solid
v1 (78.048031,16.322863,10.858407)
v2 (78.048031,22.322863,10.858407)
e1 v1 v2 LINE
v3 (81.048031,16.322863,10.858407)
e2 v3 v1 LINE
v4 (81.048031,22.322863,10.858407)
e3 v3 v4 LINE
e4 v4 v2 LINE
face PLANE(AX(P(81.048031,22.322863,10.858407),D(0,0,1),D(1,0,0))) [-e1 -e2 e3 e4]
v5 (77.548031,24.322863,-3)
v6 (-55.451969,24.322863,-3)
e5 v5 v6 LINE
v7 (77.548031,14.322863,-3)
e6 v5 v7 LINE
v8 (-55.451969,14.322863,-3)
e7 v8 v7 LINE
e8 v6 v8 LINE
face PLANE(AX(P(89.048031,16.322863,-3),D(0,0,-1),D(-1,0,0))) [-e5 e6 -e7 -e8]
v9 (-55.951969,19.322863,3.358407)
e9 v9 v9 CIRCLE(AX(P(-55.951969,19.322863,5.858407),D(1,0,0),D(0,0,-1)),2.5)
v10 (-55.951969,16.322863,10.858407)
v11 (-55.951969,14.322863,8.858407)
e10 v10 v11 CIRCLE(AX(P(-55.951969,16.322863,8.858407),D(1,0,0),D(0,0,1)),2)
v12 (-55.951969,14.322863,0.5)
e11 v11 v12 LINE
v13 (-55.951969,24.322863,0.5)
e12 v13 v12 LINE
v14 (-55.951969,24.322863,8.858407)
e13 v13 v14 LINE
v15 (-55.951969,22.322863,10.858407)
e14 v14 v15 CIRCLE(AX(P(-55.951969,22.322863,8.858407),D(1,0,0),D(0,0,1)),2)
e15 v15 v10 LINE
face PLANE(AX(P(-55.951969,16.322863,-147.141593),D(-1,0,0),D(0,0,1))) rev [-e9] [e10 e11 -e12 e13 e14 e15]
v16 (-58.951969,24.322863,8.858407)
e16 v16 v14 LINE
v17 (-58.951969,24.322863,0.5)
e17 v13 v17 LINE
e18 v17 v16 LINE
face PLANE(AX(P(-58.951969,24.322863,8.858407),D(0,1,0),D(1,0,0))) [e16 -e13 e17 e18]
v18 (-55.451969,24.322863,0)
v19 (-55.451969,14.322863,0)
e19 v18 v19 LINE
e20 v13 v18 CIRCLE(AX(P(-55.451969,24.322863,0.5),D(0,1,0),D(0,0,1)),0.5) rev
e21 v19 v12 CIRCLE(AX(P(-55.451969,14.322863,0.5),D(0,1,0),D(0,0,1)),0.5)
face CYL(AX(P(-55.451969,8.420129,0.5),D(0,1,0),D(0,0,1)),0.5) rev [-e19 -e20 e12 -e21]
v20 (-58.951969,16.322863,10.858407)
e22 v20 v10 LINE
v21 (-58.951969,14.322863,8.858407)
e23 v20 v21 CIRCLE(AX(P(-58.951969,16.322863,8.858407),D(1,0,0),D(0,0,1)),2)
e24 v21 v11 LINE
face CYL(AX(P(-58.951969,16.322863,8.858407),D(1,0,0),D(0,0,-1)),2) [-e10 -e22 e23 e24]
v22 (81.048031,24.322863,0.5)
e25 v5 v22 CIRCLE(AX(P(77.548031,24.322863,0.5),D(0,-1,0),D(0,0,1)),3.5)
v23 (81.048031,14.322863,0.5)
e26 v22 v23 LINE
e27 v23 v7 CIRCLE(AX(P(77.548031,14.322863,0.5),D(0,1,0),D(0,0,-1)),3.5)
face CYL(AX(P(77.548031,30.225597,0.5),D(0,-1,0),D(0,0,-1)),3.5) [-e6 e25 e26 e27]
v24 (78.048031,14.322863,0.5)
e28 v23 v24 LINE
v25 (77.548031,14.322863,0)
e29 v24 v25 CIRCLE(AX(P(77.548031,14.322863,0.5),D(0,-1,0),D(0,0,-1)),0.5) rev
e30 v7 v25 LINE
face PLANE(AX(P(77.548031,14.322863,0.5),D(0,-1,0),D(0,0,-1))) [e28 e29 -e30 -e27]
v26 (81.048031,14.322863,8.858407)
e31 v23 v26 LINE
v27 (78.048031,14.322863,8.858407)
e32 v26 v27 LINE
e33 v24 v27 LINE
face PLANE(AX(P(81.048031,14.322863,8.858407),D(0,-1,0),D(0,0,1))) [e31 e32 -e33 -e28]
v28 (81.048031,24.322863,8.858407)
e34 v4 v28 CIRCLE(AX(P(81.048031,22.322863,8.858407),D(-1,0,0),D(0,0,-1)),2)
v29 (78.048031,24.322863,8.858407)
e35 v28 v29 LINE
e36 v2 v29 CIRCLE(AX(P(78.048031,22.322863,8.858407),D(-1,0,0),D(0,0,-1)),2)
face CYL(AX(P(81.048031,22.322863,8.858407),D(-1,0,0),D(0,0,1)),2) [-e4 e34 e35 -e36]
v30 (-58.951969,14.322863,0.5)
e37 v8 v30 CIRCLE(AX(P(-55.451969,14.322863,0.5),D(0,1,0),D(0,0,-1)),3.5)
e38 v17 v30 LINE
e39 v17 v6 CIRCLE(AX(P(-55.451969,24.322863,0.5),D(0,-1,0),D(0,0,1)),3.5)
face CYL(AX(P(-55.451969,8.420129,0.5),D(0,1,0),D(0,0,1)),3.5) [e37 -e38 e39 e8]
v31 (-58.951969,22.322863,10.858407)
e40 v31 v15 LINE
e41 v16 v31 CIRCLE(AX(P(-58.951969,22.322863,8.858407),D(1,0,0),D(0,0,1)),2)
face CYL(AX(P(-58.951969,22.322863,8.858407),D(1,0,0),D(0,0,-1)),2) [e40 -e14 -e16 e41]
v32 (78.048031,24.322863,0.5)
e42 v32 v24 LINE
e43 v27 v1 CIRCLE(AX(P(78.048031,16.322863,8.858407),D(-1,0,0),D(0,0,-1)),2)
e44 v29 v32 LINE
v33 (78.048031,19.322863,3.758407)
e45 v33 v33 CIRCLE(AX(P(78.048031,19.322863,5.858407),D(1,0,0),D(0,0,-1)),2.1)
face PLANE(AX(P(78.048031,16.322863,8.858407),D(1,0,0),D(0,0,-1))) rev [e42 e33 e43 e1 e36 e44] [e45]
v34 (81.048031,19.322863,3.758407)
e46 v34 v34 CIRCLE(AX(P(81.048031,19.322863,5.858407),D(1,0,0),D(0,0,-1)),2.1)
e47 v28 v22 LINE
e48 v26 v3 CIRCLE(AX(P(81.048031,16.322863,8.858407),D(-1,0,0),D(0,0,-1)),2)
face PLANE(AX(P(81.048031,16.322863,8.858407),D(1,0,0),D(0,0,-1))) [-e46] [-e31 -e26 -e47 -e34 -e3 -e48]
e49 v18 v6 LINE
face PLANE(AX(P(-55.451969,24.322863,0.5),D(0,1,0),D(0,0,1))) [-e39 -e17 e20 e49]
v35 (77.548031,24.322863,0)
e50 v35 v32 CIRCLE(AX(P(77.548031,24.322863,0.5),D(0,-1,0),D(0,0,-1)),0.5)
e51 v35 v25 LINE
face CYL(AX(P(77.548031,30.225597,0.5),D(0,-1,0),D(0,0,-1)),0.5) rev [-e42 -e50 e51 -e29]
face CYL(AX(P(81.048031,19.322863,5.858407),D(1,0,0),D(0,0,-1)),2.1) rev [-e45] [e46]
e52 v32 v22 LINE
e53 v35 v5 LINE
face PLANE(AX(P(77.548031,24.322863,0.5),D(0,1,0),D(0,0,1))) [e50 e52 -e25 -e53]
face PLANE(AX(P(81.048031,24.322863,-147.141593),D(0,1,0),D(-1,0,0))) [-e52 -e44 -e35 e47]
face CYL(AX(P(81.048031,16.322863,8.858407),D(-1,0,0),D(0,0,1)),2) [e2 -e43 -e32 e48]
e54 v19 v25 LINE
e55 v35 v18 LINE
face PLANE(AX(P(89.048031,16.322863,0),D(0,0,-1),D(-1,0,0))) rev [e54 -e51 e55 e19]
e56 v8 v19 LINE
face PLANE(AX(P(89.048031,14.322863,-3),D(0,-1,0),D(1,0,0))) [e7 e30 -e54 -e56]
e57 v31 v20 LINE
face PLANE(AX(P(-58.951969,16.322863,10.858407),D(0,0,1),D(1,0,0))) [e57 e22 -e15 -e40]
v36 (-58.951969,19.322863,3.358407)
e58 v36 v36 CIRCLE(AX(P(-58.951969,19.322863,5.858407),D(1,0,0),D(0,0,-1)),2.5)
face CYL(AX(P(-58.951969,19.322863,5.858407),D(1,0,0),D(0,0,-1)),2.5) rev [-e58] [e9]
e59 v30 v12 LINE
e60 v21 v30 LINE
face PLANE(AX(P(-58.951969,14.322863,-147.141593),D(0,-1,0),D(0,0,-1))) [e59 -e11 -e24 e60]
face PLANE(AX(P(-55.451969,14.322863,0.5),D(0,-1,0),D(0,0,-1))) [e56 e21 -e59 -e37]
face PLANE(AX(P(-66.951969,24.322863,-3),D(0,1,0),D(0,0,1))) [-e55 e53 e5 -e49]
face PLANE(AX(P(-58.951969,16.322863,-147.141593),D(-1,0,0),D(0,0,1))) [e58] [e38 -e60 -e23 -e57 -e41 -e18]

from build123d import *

# Parameters (mm, degrees)
SKETCH_1_R             = 2.5
SKETCH_1_R_2           = 2
SM_BASE_FLANGE_1_DEPTH = 3
OTHER_START            = 78.048031103
OTHER_1_OUTLINE_R      = 2.5
OTHER_1_OUTLINE_R_2    = 2
OTHER_1_DEPTH          = 3
OTHER_START_2          = -68.951968897
OTHER_1_2_OUTLINE_W    = 10
OTHER_1_2_OUTLINE_H    = 3
OTHER_1_2_DEPTH        = 10
OTHER_START_3          = 81.048031103
OTHER_1_3_OUTLINE_W    = 10
OTHER_1_3_OUTLINE_H    = 3
OTHER_1_3_DEPTH        = 10
OTHER_START_4          = -58.951968897
OTHER_1_4_OUTLINE_R    = 2.5
OTHER_1_4_DEPTH        = 3.5
OTHER_START_5          = 77.548031103
OTHER_1_5_OUTLINE_R    = 2.5
OTHER_1_5_DEPTH        = 3.5
OTHER_START_6          = 13
OTHER_1_6_DEPTH        = 12
HOLE_WIZARD_M5_1_D     = 4.2


with BuildPart() as part:
    # 基体-法兰1: sheet metal written as solids
    # Sketch 1 → 基体-法兰1 (new body)
    with BuildSketch(Plane.XY):
        with BuildLine():
            Line((-66.951968897, 24.322862815), (89.048031103, 24.322862815))
            ThreePointArc((89.048031103, 24.322862815), (90.462244666, 23.737076377), (91.048031103, 22.322862815))
            Line((91.048031103, 22.322862815), (91.048031103, 16.322862815))
            ThreePointArc((91.048031103, 16.322862815), (90.462244666, 14.908649252), (89.048031103, 14.322862815))
            Line((89.048031103, 14.322862815), (-66.951968897, 14.322862815))
            ThreePointArc((-66.951968897, 14.322862815), (-68.366182459, 14.908649252), (-68.951968897, 16.322862815))
            Line((-68.951968897, 16.322862815), (-68.951968897, 22.322862815))
            ThreePointArc((-68.951968897, 22.322862815), (-68.366182459, 23.737076377), (-66.951968897, 24.322862815))
        make_face()
        with Locations((-63.951968897, 19.322862815)):
            Circle(SKETCH_1_R, mode=Mode.SUBTRACT)
        with Locations((86.048031103, 19.322862815)):
            Circle(SKETCH_1_R_2, mode=Mode.SUBTRACT)
    extrude(amount=-SM_BASE_FLANGE_1_DEPTH)

    # Other 1 2 outline → Other 1 2 (cut)
    with BuildSketch(Plane.YZ.offset(OTHER_START_2)):
        with Locations((19.322862815, -1.5)):
            Rectangle(OTHER_1_2_OUTLINE_W, OTHER_1_2_OUTLINE_H)
    extrude(amount=OTHER_1_2_DEPTH, mode=Mode.SUBTRACT)

    # Other 1 3 outline → Other 1 3 (cut)
    with BuildSketch(Plane.YZ.offset(OTHER_START_3)):
        with Locations((19.322862815, -1.5)):
            Rectangle(OTHER_1_3_OUTLINE_W, OTHER_1_3_OUTLINE_H)
    extrude(amount=OTHER_1_3_DEPTH, mode=Mode.SUBTRACT)

    # Other 1 4 outline → Other 1 4 (add)
    with BuildSketch(Plane.YZ.offset(OTHER_START_4)):
        with BuildLine():
            Line((14.322862815, 0), (24.322862815, 0))
            Line((24.322862815, 0), (24.322862815, 8.858407346))
            ThreePointArc((24.322862815, 8.858407346), (23.737076378, 10.272620909), (22.322862815, 10.858407346))
            Line((22.322862815, 10.858407346), (16.322862815, 10.858407346))
            ThreePointArc((16.322862815, 10.858407346), (14.908649252, 10.272620909), (14.322862815, 8.858407346))
            Line((14.322862815, 8.858407346), (14.322862815, 0))
        make_face()
        with Locations((19.322862815, 5.858407346)):
            Circle(OTHER_1_4_OUTLINE_R, mode=Mode.SUBTRACT)
    extrude(amount=OTHER_1_4_DEPTH)



with BuildPart() as body_2:
    # Other 1: read off the stored shape, not the designer's step
    # Other 1 outline → Other 1 (new body)
    with BuildSketch(Plane.YZ.offset(OTHER_START)):
        with Locations((19.322862815, 5.858407346)):
            Circle(OTHER_1_OUTLINE_R)
        with Locations((19.322862815, 5.858407346)):
            Circle(OTHER_1_OUTLINE_R_2, mode=Mode.SUBTRACT)
    extrude(amount=OTHER_1_DEPTH)


with BuildPart() as part_1:
    add(part.part)

    add(body_2.part)  # Other 1 5 merges body 2
    # Other 1 5 outline → Other 1 5 (add)
    with BuildSketch(Plane.YZ.offset(OTHER_START_5)):
        with BuildLine():
            Line((14.322862815, 0), (24.322862815, 0))
            Line((24.322862815, 0), (24.322862815, 8.858407346))
            ThreePointArc((24.322862815, 8.858407346), (23.737076378, 10.272620909), (22.322862815, 10.858407346))
            Line((22.322862815, 10.858407346), (16.322862815, 10.858407346))
            ThreePointArc((16.322862815, 10.858407346), (14.908649252, 10.272620909), (14.322862815, 8.858407346))
            Line((14.322862815, 8.858407346), (14.322862815, 0))
        make_face()
        with Locations((19.322862815, 5.858407346)):
            Circle(OTHER_1_5_OUTLINE_R, mode=Mode.SUBTRACT)
    extrude(amount=OTHER_1_5_DEPTH)

    # Other 1 6 outline → Other 1 6 (cut)
    with BuildSketch(Plane(origin=(0, 0, 0), x_dir=(1, 0, 0), z_dir=(0, 1, 0)).offset(OTHER_START_6)):
        with BuildLine():
            Line((-55.951968897, -0.5), (-55.951968897, -10.858407346))
            Line((-55.951968897, -10.858407346), (-55.451968897, -10.858407346))
            Line((-55.451968897, -10.858407346), (-55.451968897, 0))
            ThreePointArc((-55.451968897, 0), (-55.805522288, -0.146446609), (-55.951968897, -0.5))
        make_face()
        with BuildLine():
            Line((77.548031103, -10.858407346), (78.048031103, -10.858407346))
            Line((78.048031103, -10.858407346), (78.048031103, -0.5))
            ThreePointArc((78.048031103, -0.5), (77.901584494, -0.146446609), (77.548031103, 0))
            Line((77.548031103, 0), (77.548031103, -10.858407346))
        make_face()
        with BuildLine():
            Line((81.048031103, 3), (77.548031103, 3))
            ThreePointArc((77.548031103, 3), (80.022904837, 1.974873734), (81.048031103, -0.5))
            Line((81.048031103, -0.5), (81.048031103, 3))
        make_face()
        with BuildLine():
            ThreePointArc((-58.951968897, -0.5), (-57.926842631, 1.974873734), (-55.451968897, 3))
            Line((-55.451968897, 3), (-58.951968897, 3))
            Line((-58.951968897, 3), (-58.951968897, -0.5))
        make_face()
    extrude(amount=OTHER_1_6_DEPTH, mode=Mode.SUBTRACT)

    # M5 螺纹孔1 (through all)
    with Locations(Plane(origin=(81.048031103, 0, 0), x_dir=(0, 0, -1), z_dir=(1, 0, 0))):
        with Locations((-5.858407346, 19.322862815)):
            Hole(HOLE_WIZARD_M5_1_D / 2)


solid = part_1.part
